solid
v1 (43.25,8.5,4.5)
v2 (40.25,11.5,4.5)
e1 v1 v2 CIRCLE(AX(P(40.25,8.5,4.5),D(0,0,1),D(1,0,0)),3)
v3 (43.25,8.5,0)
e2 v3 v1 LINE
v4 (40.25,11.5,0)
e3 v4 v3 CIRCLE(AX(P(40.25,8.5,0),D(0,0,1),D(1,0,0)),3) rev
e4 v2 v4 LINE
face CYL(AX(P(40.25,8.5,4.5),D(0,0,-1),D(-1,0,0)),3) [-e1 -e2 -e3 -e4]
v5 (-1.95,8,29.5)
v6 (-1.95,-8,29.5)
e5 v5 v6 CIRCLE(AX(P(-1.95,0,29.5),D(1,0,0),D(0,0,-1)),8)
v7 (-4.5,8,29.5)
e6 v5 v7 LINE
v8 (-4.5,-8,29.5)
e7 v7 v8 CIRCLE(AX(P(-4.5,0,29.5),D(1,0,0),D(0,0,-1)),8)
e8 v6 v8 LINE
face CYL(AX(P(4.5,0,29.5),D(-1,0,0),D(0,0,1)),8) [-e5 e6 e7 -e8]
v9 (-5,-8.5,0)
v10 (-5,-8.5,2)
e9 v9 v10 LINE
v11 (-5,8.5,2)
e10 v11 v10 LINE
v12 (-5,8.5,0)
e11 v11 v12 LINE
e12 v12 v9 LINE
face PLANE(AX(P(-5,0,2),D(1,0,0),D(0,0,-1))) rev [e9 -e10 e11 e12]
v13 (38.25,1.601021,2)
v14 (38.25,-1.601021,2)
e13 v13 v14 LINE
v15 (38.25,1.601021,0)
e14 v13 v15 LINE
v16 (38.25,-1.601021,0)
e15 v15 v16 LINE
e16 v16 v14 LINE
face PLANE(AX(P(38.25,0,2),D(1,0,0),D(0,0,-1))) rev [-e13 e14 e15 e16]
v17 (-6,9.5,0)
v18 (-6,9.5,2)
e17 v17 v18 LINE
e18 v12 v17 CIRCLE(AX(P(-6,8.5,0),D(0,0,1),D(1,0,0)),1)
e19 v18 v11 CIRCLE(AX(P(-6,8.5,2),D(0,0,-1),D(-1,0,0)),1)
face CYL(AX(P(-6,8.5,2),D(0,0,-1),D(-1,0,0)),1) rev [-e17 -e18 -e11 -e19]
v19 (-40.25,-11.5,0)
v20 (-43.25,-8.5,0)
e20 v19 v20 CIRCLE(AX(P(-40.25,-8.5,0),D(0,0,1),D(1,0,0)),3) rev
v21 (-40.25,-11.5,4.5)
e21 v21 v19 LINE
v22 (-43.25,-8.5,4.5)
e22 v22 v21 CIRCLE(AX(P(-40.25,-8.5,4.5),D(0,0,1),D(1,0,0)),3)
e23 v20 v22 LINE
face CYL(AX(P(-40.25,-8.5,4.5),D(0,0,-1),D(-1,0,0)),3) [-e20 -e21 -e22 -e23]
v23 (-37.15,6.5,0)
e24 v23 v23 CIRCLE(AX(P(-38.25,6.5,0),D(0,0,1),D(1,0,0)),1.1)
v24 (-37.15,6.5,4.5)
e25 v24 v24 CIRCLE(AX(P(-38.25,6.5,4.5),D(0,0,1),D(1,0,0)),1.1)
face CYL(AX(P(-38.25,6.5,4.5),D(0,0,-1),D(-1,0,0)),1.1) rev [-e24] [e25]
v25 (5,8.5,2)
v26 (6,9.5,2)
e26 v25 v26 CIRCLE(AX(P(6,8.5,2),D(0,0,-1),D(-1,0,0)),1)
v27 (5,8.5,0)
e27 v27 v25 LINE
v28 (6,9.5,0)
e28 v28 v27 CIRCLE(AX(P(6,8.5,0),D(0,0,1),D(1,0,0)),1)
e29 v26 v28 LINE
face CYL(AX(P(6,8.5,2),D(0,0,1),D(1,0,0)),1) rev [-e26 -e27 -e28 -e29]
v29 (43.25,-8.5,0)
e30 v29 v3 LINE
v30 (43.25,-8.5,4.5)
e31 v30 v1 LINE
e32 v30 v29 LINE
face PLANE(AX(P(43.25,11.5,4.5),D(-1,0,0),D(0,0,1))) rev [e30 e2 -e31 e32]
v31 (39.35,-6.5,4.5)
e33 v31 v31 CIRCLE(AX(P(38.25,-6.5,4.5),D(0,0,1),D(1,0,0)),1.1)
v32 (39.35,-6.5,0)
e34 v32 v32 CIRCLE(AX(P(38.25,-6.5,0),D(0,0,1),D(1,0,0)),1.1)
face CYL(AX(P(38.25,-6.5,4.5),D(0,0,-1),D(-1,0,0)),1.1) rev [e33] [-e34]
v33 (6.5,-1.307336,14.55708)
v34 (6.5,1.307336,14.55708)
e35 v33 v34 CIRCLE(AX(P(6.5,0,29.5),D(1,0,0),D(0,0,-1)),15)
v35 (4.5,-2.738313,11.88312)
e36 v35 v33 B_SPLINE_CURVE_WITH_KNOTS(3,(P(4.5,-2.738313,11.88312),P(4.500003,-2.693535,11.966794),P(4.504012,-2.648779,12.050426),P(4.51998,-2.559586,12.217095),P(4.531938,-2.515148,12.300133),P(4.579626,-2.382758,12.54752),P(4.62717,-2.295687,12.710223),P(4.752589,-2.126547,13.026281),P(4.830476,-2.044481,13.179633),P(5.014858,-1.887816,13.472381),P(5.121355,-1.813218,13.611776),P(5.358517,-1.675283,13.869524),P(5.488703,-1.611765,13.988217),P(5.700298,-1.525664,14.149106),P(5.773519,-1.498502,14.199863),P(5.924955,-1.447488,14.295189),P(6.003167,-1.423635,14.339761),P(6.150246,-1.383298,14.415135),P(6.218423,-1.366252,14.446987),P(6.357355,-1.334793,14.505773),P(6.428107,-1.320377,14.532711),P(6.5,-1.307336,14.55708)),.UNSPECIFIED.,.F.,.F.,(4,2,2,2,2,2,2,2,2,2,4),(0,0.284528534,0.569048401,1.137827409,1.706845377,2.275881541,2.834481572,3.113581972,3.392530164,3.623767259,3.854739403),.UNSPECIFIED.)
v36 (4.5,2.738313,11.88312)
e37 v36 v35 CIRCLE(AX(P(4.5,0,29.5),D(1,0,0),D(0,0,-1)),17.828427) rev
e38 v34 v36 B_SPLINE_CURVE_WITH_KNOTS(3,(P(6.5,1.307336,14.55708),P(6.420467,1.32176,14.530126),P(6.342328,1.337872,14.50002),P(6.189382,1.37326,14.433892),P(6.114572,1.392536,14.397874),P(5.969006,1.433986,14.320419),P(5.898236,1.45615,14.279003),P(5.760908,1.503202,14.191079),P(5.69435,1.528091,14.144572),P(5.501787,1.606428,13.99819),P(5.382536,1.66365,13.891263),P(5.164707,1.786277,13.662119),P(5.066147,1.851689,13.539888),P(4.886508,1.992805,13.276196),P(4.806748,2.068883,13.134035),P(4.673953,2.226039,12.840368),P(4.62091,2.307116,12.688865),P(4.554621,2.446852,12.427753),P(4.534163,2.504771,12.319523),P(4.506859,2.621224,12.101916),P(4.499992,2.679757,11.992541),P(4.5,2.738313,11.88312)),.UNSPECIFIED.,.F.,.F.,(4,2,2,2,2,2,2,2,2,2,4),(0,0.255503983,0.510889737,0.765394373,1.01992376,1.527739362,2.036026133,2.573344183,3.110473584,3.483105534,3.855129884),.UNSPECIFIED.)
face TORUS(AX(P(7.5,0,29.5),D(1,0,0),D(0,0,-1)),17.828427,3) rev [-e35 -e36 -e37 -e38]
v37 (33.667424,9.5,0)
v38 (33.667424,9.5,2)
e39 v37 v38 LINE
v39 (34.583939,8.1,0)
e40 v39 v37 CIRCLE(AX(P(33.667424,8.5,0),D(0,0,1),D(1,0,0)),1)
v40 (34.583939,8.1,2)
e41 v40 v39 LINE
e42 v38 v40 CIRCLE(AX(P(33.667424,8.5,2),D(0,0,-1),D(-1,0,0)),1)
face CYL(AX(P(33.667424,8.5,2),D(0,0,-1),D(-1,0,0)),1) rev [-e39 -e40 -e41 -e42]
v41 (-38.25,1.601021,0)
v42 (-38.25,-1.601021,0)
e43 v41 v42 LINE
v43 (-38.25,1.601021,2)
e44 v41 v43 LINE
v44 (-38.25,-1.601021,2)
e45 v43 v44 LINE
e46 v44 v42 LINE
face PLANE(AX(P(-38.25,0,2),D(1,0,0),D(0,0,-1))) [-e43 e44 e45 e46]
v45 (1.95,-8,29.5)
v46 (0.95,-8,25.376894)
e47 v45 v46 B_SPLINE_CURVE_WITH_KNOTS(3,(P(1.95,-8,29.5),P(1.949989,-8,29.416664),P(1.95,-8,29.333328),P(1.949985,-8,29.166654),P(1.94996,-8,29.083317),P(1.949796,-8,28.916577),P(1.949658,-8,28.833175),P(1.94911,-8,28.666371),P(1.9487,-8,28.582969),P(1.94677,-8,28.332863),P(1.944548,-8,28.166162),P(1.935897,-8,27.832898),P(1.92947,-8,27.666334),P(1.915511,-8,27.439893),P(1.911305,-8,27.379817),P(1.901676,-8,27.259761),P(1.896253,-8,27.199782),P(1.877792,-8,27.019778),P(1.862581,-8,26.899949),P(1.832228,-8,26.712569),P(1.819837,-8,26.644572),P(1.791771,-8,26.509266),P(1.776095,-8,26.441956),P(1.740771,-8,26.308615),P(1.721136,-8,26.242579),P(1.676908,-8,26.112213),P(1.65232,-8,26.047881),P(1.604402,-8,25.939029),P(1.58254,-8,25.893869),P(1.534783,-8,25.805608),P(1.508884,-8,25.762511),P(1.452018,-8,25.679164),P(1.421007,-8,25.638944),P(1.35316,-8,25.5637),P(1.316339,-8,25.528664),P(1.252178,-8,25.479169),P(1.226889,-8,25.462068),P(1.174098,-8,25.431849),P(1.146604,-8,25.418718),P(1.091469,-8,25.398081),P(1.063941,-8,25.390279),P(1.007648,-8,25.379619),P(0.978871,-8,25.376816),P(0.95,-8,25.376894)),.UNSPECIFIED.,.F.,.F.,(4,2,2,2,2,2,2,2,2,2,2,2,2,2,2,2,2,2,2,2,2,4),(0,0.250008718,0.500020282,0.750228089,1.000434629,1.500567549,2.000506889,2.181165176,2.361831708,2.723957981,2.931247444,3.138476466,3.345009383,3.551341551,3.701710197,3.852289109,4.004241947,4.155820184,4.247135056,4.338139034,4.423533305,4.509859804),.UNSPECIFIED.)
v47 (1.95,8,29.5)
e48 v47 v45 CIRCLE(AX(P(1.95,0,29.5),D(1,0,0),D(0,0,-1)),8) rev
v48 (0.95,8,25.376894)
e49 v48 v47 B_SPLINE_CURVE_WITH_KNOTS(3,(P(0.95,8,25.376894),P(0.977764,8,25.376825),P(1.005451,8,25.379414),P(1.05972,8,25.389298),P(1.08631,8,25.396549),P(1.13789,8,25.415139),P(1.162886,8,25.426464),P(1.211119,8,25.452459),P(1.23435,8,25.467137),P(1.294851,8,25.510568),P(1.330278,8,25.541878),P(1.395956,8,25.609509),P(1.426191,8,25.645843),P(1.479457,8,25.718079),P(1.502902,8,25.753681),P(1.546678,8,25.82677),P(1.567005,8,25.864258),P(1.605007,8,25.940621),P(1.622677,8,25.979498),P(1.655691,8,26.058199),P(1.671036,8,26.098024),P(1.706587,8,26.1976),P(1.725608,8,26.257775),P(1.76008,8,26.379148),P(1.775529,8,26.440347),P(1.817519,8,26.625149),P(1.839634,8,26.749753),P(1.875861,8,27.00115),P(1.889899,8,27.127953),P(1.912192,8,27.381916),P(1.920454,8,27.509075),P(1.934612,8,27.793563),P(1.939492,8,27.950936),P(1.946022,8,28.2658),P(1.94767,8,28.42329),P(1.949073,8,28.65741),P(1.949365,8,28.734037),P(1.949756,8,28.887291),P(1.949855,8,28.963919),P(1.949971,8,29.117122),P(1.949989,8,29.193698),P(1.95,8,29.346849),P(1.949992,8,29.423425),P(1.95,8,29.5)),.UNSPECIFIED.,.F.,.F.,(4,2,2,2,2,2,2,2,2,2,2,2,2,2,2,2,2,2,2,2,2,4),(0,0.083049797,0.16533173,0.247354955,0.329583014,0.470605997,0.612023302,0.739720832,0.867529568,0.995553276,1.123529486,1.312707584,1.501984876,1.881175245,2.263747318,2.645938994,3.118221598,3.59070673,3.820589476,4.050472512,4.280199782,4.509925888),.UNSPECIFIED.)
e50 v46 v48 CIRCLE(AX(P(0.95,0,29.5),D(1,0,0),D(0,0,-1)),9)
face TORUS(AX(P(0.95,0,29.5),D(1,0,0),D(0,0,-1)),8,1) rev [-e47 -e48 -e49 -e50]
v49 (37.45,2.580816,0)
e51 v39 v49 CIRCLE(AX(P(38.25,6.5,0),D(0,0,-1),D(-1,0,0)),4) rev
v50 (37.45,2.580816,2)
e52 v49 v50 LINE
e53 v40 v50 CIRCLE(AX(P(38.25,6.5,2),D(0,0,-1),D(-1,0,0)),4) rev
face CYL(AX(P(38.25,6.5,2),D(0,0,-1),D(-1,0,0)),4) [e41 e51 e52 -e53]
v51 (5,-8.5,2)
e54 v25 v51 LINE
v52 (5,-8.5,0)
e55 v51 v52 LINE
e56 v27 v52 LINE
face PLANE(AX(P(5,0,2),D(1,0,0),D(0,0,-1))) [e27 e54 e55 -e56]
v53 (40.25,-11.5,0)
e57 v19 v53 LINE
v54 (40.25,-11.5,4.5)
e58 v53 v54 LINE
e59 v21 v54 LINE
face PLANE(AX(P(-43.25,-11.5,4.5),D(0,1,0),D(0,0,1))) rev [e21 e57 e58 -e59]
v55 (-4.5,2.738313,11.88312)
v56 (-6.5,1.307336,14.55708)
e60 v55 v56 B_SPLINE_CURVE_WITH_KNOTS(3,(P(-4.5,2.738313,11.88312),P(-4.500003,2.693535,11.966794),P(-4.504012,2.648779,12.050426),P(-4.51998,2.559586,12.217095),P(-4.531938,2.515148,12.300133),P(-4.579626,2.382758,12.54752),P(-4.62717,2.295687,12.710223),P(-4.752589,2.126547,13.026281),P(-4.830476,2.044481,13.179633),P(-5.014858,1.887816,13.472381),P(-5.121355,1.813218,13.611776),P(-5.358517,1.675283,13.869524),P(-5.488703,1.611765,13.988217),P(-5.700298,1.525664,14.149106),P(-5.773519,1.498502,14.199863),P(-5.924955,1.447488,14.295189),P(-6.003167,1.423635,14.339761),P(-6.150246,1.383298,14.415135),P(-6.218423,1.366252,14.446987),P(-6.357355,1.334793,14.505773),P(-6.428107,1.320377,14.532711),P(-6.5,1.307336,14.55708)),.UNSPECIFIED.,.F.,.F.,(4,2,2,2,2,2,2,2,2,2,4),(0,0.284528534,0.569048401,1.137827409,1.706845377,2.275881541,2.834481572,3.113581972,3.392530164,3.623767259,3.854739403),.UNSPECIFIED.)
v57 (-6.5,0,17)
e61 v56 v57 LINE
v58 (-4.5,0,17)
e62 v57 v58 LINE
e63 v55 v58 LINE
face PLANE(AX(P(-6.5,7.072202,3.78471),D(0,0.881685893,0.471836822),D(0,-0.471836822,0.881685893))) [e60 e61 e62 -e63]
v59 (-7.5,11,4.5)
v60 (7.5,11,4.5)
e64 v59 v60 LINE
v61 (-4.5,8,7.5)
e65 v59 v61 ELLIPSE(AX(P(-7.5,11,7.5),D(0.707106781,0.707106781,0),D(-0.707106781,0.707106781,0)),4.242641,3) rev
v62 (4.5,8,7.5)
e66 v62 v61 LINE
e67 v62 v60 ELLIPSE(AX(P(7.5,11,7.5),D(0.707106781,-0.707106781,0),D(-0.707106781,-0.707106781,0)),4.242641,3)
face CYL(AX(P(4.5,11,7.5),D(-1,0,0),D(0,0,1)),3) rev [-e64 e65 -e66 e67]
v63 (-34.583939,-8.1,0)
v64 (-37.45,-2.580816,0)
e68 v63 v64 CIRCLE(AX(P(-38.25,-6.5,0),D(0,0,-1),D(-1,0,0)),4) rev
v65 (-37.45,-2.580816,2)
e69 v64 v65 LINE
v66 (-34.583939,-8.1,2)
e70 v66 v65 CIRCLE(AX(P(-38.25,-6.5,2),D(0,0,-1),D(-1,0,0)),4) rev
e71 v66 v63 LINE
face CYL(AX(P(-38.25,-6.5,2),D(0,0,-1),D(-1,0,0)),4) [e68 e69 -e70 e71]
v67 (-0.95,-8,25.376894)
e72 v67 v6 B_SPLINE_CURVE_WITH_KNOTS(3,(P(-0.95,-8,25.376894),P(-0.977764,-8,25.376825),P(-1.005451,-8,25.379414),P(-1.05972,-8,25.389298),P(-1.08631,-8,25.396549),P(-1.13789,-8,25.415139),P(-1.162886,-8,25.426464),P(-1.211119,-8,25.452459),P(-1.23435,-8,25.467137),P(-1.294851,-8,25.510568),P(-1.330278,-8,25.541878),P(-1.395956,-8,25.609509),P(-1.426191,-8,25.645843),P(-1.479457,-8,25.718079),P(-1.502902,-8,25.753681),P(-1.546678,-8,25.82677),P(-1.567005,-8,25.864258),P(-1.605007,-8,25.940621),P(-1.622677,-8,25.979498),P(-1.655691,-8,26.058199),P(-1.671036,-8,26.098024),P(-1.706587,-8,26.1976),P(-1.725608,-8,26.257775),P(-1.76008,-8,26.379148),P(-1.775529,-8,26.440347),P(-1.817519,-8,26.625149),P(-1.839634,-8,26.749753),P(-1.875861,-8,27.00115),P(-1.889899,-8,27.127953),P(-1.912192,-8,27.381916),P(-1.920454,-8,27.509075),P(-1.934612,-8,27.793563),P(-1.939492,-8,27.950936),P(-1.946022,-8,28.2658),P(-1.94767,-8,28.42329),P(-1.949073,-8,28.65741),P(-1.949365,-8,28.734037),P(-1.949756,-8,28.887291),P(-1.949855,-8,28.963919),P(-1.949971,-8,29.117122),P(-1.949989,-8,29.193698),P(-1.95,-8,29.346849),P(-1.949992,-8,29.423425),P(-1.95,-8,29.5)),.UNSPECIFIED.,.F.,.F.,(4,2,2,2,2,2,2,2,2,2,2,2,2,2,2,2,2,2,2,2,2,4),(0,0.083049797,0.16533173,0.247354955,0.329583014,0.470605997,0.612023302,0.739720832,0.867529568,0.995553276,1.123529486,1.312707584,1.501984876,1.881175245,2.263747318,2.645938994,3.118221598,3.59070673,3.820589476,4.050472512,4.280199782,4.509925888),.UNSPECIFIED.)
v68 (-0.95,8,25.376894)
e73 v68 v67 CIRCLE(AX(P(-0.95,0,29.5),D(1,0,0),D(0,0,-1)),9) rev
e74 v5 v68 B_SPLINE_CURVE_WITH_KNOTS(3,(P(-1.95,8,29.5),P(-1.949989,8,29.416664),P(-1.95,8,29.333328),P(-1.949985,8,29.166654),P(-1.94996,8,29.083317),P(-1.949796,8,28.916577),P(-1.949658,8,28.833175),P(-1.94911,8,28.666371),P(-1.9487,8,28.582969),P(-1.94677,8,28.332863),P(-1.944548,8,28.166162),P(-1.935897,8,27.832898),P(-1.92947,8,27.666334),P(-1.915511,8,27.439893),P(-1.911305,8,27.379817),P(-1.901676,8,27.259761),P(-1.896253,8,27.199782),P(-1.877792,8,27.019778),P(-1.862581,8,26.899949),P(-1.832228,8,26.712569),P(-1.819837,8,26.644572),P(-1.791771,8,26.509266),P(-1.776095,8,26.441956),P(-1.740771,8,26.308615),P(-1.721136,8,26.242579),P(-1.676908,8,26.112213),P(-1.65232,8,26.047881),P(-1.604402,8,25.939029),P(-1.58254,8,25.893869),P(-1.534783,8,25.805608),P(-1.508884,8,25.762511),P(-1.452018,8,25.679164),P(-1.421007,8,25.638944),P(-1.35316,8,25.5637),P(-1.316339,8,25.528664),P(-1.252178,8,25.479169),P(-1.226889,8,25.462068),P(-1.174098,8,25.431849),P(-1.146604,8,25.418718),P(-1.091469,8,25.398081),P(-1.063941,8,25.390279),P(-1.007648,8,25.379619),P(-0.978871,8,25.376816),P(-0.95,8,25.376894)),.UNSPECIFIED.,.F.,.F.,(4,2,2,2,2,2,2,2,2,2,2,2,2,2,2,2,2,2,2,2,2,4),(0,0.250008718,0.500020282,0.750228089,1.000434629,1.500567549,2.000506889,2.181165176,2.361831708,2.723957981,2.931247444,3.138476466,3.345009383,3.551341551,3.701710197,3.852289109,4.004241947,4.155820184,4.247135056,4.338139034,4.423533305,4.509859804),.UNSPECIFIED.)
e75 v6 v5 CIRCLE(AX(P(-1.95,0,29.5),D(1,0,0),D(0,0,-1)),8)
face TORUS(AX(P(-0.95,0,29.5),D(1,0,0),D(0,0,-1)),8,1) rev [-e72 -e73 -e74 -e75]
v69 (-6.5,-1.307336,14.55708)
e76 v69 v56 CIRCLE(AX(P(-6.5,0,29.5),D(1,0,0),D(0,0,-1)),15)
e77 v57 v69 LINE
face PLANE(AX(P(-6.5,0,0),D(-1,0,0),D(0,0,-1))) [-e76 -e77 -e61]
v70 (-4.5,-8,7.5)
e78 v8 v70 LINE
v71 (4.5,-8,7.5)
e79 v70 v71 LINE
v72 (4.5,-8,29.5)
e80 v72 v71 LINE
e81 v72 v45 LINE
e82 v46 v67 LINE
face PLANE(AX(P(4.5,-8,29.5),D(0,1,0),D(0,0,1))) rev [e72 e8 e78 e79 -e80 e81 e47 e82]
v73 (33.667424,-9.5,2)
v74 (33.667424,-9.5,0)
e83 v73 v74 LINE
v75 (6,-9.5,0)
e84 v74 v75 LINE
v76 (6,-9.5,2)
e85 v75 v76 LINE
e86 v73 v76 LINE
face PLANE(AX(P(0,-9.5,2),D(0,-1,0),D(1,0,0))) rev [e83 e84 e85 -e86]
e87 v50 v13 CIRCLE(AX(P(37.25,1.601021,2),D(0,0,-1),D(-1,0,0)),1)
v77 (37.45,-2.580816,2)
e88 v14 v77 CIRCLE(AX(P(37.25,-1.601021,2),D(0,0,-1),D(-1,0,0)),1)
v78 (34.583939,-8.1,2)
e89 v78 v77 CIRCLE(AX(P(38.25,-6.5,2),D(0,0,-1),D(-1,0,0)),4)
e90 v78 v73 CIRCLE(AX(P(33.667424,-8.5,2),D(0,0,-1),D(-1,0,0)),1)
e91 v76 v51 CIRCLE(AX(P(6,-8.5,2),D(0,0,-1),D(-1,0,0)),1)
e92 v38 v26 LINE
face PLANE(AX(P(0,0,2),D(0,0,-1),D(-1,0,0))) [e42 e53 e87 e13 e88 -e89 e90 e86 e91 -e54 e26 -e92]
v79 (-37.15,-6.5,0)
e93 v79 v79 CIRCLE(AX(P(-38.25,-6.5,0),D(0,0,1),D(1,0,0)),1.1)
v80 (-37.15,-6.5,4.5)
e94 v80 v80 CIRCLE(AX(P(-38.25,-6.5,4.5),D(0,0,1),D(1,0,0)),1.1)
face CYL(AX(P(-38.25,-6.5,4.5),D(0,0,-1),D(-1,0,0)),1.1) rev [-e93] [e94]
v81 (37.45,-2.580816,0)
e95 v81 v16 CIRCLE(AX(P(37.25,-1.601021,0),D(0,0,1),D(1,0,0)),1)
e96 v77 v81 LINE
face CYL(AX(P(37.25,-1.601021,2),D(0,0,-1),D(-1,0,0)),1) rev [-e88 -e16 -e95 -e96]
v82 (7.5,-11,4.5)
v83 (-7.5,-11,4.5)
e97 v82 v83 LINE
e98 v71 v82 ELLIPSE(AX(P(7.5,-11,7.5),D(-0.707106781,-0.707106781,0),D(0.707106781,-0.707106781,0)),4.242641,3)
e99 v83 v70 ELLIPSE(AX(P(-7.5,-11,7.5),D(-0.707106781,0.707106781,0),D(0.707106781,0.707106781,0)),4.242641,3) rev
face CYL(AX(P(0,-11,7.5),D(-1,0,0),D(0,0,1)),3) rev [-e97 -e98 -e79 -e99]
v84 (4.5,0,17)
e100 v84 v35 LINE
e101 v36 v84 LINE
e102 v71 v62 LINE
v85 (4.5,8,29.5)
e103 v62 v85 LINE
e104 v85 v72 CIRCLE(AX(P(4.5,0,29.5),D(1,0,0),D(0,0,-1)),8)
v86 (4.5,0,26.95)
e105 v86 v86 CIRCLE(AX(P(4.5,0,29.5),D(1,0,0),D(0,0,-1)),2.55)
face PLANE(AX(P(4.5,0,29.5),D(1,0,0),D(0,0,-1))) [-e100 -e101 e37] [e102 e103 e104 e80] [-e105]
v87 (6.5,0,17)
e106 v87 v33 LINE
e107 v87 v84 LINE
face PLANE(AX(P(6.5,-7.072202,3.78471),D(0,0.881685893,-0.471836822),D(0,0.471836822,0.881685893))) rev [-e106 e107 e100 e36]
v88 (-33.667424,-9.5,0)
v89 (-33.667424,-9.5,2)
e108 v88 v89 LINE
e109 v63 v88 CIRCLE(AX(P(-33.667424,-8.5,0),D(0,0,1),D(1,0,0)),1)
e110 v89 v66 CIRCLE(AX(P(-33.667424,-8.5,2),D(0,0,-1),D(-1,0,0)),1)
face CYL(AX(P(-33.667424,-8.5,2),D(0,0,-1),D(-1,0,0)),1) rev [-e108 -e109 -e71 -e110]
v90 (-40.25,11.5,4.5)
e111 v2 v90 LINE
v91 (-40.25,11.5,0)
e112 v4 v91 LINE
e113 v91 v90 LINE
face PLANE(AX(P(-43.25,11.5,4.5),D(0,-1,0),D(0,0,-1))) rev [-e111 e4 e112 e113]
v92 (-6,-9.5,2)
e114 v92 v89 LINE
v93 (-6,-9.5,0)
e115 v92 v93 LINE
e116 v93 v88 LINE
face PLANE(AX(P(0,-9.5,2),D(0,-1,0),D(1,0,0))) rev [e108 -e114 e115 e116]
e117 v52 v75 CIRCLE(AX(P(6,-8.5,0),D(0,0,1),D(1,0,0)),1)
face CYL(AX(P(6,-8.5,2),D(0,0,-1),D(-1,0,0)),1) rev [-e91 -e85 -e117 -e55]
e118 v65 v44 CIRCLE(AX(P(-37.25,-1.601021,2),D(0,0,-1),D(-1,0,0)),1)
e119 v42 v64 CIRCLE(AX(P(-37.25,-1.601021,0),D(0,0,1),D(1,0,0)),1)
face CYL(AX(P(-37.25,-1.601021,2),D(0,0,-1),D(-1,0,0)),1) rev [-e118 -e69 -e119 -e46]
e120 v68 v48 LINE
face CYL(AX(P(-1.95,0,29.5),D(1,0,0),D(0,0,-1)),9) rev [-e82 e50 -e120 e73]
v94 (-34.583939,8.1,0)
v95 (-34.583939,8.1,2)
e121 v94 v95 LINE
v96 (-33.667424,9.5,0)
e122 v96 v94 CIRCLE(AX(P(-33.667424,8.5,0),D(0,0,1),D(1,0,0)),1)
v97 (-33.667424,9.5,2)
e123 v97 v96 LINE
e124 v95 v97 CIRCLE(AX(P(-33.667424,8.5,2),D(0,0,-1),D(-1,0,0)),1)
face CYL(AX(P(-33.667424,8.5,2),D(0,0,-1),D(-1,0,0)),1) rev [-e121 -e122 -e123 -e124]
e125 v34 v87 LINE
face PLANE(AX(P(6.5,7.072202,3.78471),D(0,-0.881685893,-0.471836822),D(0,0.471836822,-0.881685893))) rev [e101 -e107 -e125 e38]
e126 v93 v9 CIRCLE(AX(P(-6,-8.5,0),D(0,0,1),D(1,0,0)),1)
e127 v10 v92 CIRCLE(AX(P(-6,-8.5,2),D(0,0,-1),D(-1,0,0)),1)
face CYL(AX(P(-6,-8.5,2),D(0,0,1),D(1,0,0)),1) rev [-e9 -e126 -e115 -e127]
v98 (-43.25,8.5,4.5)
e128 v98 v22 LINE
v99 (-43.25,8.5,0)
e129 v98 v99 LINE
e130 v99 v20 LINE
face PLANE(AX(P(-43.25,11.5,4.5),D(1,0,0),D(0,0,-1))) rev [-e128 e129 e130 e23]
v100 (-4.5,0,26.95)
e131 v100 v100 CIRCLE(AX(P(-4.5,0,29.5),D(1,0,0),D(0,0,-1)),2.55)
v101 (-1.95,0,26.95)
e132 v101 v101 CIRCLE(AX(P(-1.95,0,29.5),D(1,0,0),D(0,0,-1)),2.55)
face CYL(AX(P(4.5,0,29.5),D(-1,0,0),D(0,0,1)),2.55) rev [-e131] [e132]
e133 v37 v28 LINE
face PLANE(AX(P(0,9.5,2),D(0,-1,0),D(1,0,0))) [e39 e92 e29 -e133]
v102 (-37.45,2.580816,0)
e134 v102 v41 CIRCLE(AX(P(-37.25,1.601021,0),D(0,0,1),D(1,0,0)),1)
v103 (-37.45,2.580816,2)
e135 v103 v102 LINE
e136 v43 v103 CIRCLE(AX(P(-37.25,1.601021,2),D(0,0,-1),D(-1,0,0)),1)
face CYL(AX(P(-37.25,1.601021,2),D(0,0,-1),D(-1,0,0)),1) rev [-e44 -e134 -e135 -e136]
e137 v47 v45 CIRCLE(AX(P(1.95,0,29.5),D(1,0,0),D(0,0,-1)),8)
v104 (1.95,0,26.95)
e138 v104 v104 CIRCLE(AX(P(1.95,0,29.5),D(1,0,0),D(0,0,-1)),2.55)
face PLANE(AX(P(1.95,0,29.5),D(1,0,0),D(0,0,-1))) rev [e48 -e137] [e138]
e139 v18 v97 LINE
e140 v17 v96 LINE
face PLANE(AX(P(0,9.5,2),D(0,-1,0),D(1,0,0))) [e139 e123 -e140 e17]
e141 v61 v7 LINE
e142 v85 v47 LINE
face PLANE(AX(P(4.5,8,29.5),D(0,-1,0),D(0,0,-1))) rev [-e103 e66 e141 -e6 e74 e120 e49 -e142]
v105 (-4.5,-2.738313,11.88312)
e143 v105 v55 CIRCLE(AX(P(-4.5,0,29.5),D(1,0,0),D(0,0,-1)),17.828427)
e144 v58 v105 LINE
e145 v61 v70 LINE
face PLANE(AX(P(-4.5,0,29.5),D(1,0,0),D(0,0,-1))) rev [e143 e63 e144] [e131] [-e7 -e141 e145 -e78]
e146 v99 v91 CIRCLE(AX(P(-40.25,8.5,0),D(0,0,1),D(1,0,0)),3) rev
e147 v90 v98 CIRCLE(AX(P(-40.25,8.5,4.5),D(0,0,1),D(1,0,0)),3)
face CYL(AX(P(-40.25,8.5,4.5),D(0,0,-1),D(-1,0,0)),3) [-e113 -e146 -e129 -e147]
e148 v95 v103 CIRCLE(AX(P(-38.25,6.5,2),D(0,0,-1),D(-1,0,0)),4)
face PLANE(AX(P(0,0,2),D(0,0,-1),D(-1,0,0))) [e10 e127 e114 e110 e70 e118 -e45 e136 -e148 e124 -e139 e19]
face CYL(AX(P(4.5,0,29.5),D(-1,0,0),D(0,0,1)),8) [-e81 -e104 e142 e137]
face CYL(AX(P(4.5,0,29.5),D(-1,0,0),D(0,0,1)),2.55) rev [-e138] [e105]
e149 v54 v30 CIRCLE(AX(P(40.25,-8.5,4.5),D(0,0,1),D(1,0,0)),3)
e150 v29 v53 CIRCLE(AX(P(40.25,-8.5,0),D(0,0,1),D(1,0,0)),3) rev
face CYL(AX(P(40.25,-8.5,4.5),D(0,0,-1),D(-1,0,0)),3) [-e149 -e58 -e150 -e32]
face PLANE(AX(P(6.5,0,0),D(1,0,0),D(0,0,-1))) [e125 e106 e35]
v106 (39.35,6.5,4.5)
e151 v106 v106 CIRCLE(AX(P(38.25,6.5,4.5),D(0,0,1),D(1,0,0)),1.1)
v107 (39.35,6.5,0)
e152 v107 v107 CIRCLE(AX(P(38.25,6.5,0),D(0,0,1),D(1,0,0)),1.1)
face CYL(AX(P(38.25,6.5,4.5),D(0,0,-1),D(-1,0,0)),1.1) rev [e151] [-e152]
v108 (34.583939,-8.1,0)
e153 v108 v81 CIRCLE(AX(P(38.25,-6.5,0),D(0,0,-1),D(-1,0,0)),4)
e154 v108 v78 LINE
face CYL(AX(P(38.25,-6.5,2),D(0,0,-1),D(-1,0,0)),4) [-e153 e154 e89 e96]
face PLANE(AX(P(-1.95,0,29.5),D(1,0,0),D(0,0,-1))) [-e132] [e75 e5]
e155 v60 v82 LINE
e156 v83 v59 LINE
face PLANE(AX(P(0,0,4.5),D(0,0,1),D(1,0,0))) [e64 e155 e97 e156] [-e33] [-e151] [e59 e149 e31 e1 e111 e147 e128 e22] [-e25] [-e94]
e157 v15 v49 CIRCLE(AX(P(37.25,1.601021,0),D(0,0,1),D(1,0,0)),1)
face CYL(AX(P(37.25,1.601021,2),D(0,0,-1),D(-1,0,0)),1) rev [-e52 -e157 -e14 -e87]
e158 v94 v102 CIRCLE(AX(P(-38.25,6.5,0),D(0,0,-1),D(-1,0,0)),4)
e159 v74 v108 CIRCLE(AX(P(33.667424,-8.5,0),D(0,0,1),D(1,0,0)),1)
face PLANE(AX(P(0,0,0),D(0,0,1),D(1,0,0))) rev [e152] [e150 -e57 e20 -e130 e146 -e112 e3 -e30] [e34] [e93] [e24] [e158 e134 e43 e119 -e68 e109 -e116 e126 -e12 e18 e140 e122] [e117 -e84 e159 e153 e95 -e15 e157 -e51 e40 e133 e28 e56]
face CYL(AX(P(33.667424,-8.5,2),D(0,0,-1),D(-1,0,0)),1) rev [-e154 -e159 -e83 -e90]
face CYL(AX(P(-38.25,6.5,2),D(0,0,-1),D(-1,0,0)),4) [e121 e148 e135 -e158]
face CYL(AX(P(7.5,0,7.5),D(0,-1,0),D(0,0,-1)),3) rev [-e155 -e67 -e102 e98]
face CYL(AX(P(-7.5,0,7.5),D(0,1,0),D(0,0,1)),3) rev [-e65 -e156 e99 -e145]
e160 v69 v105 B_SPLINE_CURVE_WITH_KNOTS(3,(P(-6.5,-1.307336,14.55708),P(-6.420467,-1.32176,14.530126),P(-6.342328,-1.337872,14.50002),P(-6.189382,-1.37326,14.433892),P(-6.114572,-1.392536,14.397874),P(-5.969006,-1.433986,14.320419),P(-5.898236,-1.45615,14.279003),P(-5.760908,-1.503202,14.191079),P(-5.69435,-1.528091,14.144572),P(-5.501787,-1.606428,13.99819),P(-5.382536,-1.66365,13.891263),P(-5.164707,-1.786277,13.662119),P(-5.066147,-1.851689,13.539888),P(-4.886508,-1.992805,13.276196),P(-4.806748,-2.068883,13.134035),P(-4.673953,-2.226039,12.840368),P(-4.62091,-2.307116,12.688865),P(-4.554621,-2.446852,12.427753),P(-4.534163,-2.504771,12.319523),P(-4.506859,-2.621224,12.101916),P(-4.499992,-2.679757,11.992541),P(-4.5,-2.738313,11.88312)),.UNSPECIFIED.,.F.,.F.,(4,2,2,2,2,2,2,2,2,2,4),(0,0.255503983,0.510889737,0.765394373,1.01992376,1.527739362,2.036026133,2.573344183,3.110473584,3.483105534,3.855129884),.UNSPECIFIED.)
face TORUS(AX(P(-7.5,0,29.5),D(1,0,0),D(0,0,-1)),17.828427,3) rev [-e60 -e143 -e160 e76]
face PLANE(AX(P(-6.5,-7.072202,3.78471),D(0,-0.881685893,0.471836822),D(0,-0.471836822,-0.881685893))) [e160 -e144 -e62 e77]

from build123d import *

# Parameters (mm, degrees)
SKETCH1_W           = 86.5
SKETCH1_H           = 23
SKETCH1_R           = 1.1
BOSS_EXTRUDE1_DEPTH = 4.5
CUT_EXTRUDE1_DEPTH  = 2
SKETCH3_R           = 2.55
BOSS_EXTRUDE2_DEPTH = 4.5
SKETCH6_R           = 9
CUT_EXTRUDE3_DEPTH  = 1.95
FILLET1_R           = 3
FILLET2_R           = 1
FILLET3_R           = 1
BOSS_EXTRUDE3_DEPTH = 2
FILLET4_R           = 3


with BuildPart() as part:
    # Sketch1 → Boss-Extrude1 (new body)
    with BuildSketch(Plane.XY):
        Rectangle(SKETCH1_W, SKETCH1_H)
        with Locations((38.25, 6.5)):
            Circle(SKETCH1_R, mode=Mode.SUBTRACT)
        with Locations((38.25, -6.5)):
            Circle(SKETCH1_R, mode=Mode.SUBTRACT)
        with Locations((-38.25, -6.5)):
            Circle(SKETCH1_R, mode=Mode.SUBTRACT)
        with Locations((-38.25, 6.5)):
            Circle(SKETCH1_R, mode=Mode.SUBTRACT)
    extrude(amount=BOSS_EXTRUDE1_DEPTH)

    # Sketch2 → Cut-Extrude1 (cut)
    with BuildSketch(Plane(origin=(0, 0, 0), x_dir=(-1, 0, 0), z_dir=(0, 0, -1))):
        with BuildLine():
            Line((-5, 9.5), (-35.604248689, 9.5))
            ThreePointArc((-35.604248689, 9.5), (-34.508342613, 5.085786438), (-38.25, 2.5))
            Line((-38.25, 2.5), (-38.25, -2.5))
            ThreePointArc((-38.25, -2.5), (-34.508342613, -5.085786438), (-35.604248689, -9.5))
            Line((-35.604248689, -9.5), (-5, -9.5))
            Line((-5, -9.5), (-5, 9.5))
        make_face()
        with BuildLine():
            Line((35.604248689, 9.5), (5, 9.5))
            Line((5, 9.5), (5, -9.5))
            Line((5, -9.5), (35.604248689, -9.5))
            ThreePointArc((35.604248689, -9.5), (34.508342613, -5.085786438), (38.25, -2.5))
            Line((38.25, -2.5), (38.25, 2.5))
            ThreePointArc((38.25, 2.5), (34.508342613, 5.085786438), (35.604248689, 9.5))
        make_face()
    extrude(amount=-CUT_EXTRUDE1_DEPTH, mode=Mode.SUBTRACT)

    # Sketch3 → Boss-Extrude2 (add, symmetric)
    with BuildSketch(Plane(origin=(0, 0, 0), x_dir=(0, 0, -1), z_dir=(1, 0, 0))):
        with BuildLine():
            Line((-29.5, 8), (-4.5, 8))
            Line((-4.5, 8), (-4.5, -8))
            Line((-4.5, -8), (-29.5, -8))
            ThreePointArc((-29.5, -8), (-37.5, 0), (-29.5, 8))
        make_face()
        with Locations((-29.5, 0)):
            Circle(SKETCH3_R, mode=Mode.SUBTRACT)
    extrude(amount=BOSS_EXTRUDE2_DEPTH, both=True)

    # Sketch6 → Cut-Extrude3 (cut, symmetric)
    with BuildSketch(Plane(origin=(0, 0, 0), x_dir=(0, 0, -1), z_dir=(1, 0, 0))):
        with Locations((-29.5, 0)):
            Circle(SKETCH6_R)
    extrude(amount=CUT_EXTRUDE3_DEPTH, both=True, mode=Mode.SUBTRACT)

    # Fillet1
    fillet1_edges = [part.edges().sort_by_distance(p)[0] for p in [
        (4.5, 0, 4.5),
        (-4.5, 0, 4.5),
        (0, -8, 4.5),
        (0, 8, 4.5),
        (43.25, -11.5, 2.25),
        (-43.25, -11.5, 2.25),
        (-43.25, 11.5, 2.25),
        (43.25, 11.5, 2.25),
    ]]
    fillet(fillet1_edges, radius=FILLET1_R)

    # Fillet2
    fillet2_edges = [part.edges().sort_by_distance(p)[0] for p in [
        (1.95, 0, 20.5),
        (-1.95, 0, 20.5),
    ]]
    fillet(fillet2_edges, radius=FILLET2_R)

    # Fillet3
    fillet3_edges = [part.edges().sort_by_distance(p)[0] for p in [
        (35.604248689, -9.5, 1),
        (38.25, -2.5, 1),
        (38.25, 2.5, 1),
        (35.604248689, 9.5, 1),
        (5, 9.5, 1),
        (5, -9.5, 1),
        (-35.604248689, -9.5, 1),
        (-5, -9.5, 1),
        (-5, 9.5, 1),
        (-35.604248689, 9.5, 1),
        (-38.25, 2.5, 1),
        (-38.25, -2.5, 1),
    ]]
    fillet(fillet3_edges, radius=FILLET3_R)

    # Sketch7 → Boss-Extrude3 (add)
    with BuildSketch(Plane(origin=(4.5, 0, 0), x_dir=(0, 0, -1), z_dir=(1, 0, 0))):
        Polygon((-14.557079529, 1.307336141), (-17, 0), (-14.557079529, 0), align=None)
        Polygon((-14.557079529, 0), (-17, 0), (-14.557079529, -1.307336141), align=None)
        with BuildLine():
            Line((-14.557079529, 0), (-14.557079529, -1.307336141))
            ThreePointArc((-14.557079529, -1.307336141), (-14.514276676, -0.65429081), (-14.5, 0))
            Line((-14.5, 0), (-14.557079529, 0))
        make_face()
        with BuildLine():
            ThreePointArc((-14.5, 0), (-14.514276676, 0.65429081), (-14.557079529, 1.307336141))
            Line((-14.557079529, 1.307336141), (-14.557079529, 0))
            Line((-14.557079529, 0), (-14.5, 0))
        make_face()
    boss_extrude3 = extrude(amount=BOSS_EXTRUDE3_DEPTH)

    # Mirror1: Boss-Extrude3 across plane
    add(boss_extrude3.mirror(Plane(origin=(0, 0, 0), x_dir=(0, 0, 1), z_dir=(1, 0, 0))))

    # Fillet4
    # the kernel refuses this fillet: 3 mm, written as the material it adds along each edge
    with BuildSketch(Plane(origin=(4.5, 0, 29.5), x_dir=(0, -0.5300616948891074, -0.8479590789721441), z_dir=(0, -0.8479590789721441, 0.5300616948891074))) as fillet4_piece_1_section:
        with BuildLine():
            CenterArc((17.828427125, 3), FILLET4_R, 199.471220634, 70.528779366)
            Line((15, 2), (14.943431458, 1.98))
            ThreePointArc((14.943431458, 1.98), (14.94, 1), (14.94, 0))
            Line((14.94, 0), (15, -0.06))
            Line((15, -0.06), (17.828427125, -0.06))
            Line((17.828427125, -0.06), (17.828427125, 0))
        make_face()
    fillet4_piece_1 = revolve(axis=Axis((4.5, 0, 29.5), (1, 0, 0)), revolution_arc=64.019246795, mode=Mode.PRIVATE)
    fillet4_piece_1 = split(fillet4_piece_1, bisect_by=Plane(origin=(4.960273163, -1.358360802, 14.461733593), z_dir=(0, 0.8816858925187555, -0.47183682235854135)), keep=Keep.TOP, mode=Mode.PRIVATE)
    fillet4_piece_1 = split(fillet4_piece_1, bisect_by=Plane(origin=(4.960273163, 1.358360693, 14.461733796), z_dir=(0, -0.8816858925186548, -0.4718368223587294)), keep=Keep.TOP, mode=Mode.PRIVATE)
    add(fillet4_piece_1)
    with BuildSketch(Plane(origin=(-4.5, 0, 29.5), x_dir=(0, -0.5300616948891074, -0.8479590789721441), z_dir=(0, -0.8479590789721441, 0.5300616948891074))) as fillet4_piece_2_section:
        with BuildLine():
            CenterArc((17.828427125, -3), FILLET4_R, 90, 70.528779366)
            Line((15, -2), (14.943431458, -1.98))
            ThreePointArc((14.943431458, -1.98), (14.94, -1), (14.94, 0))
            Line((14.94, 0), (15, 0.06))
            Line((15, 0.06), (17.828427125, 0.06))
            Line((17.828427125, 0.06), (17.828427125, 0))
        make_face()
    fillet4_piece_2 = revolve(axis=Axis((-4.5, 0, 29.5), (1, 0, 0)), revolution_arc=64.019246795, mode=Mode.PRIVATE)
    fillet4_piece_2 = split(fillet4_piece_2, bisect_by=Plane(origin=(-4.960273163, -1.358360802, 14.461733593), z_dir=(0, 0.8816858925187555, -0.47183682235854135)), keep=Keep.TOP, mode=Mode.PRIVATE)
    fillet4_piece_2 = split(fillet4_piece_2, bisect_by=Plane(origin=(-4.960273163, 1.358360693, 14.461733796), z_dir=(0, -0.8816858925186548, -0.4718368223587294)), keep=Keep.TOP, mode=Mode.PRIVATE)
    add(fillet4_piece_2)


solid = part.part
